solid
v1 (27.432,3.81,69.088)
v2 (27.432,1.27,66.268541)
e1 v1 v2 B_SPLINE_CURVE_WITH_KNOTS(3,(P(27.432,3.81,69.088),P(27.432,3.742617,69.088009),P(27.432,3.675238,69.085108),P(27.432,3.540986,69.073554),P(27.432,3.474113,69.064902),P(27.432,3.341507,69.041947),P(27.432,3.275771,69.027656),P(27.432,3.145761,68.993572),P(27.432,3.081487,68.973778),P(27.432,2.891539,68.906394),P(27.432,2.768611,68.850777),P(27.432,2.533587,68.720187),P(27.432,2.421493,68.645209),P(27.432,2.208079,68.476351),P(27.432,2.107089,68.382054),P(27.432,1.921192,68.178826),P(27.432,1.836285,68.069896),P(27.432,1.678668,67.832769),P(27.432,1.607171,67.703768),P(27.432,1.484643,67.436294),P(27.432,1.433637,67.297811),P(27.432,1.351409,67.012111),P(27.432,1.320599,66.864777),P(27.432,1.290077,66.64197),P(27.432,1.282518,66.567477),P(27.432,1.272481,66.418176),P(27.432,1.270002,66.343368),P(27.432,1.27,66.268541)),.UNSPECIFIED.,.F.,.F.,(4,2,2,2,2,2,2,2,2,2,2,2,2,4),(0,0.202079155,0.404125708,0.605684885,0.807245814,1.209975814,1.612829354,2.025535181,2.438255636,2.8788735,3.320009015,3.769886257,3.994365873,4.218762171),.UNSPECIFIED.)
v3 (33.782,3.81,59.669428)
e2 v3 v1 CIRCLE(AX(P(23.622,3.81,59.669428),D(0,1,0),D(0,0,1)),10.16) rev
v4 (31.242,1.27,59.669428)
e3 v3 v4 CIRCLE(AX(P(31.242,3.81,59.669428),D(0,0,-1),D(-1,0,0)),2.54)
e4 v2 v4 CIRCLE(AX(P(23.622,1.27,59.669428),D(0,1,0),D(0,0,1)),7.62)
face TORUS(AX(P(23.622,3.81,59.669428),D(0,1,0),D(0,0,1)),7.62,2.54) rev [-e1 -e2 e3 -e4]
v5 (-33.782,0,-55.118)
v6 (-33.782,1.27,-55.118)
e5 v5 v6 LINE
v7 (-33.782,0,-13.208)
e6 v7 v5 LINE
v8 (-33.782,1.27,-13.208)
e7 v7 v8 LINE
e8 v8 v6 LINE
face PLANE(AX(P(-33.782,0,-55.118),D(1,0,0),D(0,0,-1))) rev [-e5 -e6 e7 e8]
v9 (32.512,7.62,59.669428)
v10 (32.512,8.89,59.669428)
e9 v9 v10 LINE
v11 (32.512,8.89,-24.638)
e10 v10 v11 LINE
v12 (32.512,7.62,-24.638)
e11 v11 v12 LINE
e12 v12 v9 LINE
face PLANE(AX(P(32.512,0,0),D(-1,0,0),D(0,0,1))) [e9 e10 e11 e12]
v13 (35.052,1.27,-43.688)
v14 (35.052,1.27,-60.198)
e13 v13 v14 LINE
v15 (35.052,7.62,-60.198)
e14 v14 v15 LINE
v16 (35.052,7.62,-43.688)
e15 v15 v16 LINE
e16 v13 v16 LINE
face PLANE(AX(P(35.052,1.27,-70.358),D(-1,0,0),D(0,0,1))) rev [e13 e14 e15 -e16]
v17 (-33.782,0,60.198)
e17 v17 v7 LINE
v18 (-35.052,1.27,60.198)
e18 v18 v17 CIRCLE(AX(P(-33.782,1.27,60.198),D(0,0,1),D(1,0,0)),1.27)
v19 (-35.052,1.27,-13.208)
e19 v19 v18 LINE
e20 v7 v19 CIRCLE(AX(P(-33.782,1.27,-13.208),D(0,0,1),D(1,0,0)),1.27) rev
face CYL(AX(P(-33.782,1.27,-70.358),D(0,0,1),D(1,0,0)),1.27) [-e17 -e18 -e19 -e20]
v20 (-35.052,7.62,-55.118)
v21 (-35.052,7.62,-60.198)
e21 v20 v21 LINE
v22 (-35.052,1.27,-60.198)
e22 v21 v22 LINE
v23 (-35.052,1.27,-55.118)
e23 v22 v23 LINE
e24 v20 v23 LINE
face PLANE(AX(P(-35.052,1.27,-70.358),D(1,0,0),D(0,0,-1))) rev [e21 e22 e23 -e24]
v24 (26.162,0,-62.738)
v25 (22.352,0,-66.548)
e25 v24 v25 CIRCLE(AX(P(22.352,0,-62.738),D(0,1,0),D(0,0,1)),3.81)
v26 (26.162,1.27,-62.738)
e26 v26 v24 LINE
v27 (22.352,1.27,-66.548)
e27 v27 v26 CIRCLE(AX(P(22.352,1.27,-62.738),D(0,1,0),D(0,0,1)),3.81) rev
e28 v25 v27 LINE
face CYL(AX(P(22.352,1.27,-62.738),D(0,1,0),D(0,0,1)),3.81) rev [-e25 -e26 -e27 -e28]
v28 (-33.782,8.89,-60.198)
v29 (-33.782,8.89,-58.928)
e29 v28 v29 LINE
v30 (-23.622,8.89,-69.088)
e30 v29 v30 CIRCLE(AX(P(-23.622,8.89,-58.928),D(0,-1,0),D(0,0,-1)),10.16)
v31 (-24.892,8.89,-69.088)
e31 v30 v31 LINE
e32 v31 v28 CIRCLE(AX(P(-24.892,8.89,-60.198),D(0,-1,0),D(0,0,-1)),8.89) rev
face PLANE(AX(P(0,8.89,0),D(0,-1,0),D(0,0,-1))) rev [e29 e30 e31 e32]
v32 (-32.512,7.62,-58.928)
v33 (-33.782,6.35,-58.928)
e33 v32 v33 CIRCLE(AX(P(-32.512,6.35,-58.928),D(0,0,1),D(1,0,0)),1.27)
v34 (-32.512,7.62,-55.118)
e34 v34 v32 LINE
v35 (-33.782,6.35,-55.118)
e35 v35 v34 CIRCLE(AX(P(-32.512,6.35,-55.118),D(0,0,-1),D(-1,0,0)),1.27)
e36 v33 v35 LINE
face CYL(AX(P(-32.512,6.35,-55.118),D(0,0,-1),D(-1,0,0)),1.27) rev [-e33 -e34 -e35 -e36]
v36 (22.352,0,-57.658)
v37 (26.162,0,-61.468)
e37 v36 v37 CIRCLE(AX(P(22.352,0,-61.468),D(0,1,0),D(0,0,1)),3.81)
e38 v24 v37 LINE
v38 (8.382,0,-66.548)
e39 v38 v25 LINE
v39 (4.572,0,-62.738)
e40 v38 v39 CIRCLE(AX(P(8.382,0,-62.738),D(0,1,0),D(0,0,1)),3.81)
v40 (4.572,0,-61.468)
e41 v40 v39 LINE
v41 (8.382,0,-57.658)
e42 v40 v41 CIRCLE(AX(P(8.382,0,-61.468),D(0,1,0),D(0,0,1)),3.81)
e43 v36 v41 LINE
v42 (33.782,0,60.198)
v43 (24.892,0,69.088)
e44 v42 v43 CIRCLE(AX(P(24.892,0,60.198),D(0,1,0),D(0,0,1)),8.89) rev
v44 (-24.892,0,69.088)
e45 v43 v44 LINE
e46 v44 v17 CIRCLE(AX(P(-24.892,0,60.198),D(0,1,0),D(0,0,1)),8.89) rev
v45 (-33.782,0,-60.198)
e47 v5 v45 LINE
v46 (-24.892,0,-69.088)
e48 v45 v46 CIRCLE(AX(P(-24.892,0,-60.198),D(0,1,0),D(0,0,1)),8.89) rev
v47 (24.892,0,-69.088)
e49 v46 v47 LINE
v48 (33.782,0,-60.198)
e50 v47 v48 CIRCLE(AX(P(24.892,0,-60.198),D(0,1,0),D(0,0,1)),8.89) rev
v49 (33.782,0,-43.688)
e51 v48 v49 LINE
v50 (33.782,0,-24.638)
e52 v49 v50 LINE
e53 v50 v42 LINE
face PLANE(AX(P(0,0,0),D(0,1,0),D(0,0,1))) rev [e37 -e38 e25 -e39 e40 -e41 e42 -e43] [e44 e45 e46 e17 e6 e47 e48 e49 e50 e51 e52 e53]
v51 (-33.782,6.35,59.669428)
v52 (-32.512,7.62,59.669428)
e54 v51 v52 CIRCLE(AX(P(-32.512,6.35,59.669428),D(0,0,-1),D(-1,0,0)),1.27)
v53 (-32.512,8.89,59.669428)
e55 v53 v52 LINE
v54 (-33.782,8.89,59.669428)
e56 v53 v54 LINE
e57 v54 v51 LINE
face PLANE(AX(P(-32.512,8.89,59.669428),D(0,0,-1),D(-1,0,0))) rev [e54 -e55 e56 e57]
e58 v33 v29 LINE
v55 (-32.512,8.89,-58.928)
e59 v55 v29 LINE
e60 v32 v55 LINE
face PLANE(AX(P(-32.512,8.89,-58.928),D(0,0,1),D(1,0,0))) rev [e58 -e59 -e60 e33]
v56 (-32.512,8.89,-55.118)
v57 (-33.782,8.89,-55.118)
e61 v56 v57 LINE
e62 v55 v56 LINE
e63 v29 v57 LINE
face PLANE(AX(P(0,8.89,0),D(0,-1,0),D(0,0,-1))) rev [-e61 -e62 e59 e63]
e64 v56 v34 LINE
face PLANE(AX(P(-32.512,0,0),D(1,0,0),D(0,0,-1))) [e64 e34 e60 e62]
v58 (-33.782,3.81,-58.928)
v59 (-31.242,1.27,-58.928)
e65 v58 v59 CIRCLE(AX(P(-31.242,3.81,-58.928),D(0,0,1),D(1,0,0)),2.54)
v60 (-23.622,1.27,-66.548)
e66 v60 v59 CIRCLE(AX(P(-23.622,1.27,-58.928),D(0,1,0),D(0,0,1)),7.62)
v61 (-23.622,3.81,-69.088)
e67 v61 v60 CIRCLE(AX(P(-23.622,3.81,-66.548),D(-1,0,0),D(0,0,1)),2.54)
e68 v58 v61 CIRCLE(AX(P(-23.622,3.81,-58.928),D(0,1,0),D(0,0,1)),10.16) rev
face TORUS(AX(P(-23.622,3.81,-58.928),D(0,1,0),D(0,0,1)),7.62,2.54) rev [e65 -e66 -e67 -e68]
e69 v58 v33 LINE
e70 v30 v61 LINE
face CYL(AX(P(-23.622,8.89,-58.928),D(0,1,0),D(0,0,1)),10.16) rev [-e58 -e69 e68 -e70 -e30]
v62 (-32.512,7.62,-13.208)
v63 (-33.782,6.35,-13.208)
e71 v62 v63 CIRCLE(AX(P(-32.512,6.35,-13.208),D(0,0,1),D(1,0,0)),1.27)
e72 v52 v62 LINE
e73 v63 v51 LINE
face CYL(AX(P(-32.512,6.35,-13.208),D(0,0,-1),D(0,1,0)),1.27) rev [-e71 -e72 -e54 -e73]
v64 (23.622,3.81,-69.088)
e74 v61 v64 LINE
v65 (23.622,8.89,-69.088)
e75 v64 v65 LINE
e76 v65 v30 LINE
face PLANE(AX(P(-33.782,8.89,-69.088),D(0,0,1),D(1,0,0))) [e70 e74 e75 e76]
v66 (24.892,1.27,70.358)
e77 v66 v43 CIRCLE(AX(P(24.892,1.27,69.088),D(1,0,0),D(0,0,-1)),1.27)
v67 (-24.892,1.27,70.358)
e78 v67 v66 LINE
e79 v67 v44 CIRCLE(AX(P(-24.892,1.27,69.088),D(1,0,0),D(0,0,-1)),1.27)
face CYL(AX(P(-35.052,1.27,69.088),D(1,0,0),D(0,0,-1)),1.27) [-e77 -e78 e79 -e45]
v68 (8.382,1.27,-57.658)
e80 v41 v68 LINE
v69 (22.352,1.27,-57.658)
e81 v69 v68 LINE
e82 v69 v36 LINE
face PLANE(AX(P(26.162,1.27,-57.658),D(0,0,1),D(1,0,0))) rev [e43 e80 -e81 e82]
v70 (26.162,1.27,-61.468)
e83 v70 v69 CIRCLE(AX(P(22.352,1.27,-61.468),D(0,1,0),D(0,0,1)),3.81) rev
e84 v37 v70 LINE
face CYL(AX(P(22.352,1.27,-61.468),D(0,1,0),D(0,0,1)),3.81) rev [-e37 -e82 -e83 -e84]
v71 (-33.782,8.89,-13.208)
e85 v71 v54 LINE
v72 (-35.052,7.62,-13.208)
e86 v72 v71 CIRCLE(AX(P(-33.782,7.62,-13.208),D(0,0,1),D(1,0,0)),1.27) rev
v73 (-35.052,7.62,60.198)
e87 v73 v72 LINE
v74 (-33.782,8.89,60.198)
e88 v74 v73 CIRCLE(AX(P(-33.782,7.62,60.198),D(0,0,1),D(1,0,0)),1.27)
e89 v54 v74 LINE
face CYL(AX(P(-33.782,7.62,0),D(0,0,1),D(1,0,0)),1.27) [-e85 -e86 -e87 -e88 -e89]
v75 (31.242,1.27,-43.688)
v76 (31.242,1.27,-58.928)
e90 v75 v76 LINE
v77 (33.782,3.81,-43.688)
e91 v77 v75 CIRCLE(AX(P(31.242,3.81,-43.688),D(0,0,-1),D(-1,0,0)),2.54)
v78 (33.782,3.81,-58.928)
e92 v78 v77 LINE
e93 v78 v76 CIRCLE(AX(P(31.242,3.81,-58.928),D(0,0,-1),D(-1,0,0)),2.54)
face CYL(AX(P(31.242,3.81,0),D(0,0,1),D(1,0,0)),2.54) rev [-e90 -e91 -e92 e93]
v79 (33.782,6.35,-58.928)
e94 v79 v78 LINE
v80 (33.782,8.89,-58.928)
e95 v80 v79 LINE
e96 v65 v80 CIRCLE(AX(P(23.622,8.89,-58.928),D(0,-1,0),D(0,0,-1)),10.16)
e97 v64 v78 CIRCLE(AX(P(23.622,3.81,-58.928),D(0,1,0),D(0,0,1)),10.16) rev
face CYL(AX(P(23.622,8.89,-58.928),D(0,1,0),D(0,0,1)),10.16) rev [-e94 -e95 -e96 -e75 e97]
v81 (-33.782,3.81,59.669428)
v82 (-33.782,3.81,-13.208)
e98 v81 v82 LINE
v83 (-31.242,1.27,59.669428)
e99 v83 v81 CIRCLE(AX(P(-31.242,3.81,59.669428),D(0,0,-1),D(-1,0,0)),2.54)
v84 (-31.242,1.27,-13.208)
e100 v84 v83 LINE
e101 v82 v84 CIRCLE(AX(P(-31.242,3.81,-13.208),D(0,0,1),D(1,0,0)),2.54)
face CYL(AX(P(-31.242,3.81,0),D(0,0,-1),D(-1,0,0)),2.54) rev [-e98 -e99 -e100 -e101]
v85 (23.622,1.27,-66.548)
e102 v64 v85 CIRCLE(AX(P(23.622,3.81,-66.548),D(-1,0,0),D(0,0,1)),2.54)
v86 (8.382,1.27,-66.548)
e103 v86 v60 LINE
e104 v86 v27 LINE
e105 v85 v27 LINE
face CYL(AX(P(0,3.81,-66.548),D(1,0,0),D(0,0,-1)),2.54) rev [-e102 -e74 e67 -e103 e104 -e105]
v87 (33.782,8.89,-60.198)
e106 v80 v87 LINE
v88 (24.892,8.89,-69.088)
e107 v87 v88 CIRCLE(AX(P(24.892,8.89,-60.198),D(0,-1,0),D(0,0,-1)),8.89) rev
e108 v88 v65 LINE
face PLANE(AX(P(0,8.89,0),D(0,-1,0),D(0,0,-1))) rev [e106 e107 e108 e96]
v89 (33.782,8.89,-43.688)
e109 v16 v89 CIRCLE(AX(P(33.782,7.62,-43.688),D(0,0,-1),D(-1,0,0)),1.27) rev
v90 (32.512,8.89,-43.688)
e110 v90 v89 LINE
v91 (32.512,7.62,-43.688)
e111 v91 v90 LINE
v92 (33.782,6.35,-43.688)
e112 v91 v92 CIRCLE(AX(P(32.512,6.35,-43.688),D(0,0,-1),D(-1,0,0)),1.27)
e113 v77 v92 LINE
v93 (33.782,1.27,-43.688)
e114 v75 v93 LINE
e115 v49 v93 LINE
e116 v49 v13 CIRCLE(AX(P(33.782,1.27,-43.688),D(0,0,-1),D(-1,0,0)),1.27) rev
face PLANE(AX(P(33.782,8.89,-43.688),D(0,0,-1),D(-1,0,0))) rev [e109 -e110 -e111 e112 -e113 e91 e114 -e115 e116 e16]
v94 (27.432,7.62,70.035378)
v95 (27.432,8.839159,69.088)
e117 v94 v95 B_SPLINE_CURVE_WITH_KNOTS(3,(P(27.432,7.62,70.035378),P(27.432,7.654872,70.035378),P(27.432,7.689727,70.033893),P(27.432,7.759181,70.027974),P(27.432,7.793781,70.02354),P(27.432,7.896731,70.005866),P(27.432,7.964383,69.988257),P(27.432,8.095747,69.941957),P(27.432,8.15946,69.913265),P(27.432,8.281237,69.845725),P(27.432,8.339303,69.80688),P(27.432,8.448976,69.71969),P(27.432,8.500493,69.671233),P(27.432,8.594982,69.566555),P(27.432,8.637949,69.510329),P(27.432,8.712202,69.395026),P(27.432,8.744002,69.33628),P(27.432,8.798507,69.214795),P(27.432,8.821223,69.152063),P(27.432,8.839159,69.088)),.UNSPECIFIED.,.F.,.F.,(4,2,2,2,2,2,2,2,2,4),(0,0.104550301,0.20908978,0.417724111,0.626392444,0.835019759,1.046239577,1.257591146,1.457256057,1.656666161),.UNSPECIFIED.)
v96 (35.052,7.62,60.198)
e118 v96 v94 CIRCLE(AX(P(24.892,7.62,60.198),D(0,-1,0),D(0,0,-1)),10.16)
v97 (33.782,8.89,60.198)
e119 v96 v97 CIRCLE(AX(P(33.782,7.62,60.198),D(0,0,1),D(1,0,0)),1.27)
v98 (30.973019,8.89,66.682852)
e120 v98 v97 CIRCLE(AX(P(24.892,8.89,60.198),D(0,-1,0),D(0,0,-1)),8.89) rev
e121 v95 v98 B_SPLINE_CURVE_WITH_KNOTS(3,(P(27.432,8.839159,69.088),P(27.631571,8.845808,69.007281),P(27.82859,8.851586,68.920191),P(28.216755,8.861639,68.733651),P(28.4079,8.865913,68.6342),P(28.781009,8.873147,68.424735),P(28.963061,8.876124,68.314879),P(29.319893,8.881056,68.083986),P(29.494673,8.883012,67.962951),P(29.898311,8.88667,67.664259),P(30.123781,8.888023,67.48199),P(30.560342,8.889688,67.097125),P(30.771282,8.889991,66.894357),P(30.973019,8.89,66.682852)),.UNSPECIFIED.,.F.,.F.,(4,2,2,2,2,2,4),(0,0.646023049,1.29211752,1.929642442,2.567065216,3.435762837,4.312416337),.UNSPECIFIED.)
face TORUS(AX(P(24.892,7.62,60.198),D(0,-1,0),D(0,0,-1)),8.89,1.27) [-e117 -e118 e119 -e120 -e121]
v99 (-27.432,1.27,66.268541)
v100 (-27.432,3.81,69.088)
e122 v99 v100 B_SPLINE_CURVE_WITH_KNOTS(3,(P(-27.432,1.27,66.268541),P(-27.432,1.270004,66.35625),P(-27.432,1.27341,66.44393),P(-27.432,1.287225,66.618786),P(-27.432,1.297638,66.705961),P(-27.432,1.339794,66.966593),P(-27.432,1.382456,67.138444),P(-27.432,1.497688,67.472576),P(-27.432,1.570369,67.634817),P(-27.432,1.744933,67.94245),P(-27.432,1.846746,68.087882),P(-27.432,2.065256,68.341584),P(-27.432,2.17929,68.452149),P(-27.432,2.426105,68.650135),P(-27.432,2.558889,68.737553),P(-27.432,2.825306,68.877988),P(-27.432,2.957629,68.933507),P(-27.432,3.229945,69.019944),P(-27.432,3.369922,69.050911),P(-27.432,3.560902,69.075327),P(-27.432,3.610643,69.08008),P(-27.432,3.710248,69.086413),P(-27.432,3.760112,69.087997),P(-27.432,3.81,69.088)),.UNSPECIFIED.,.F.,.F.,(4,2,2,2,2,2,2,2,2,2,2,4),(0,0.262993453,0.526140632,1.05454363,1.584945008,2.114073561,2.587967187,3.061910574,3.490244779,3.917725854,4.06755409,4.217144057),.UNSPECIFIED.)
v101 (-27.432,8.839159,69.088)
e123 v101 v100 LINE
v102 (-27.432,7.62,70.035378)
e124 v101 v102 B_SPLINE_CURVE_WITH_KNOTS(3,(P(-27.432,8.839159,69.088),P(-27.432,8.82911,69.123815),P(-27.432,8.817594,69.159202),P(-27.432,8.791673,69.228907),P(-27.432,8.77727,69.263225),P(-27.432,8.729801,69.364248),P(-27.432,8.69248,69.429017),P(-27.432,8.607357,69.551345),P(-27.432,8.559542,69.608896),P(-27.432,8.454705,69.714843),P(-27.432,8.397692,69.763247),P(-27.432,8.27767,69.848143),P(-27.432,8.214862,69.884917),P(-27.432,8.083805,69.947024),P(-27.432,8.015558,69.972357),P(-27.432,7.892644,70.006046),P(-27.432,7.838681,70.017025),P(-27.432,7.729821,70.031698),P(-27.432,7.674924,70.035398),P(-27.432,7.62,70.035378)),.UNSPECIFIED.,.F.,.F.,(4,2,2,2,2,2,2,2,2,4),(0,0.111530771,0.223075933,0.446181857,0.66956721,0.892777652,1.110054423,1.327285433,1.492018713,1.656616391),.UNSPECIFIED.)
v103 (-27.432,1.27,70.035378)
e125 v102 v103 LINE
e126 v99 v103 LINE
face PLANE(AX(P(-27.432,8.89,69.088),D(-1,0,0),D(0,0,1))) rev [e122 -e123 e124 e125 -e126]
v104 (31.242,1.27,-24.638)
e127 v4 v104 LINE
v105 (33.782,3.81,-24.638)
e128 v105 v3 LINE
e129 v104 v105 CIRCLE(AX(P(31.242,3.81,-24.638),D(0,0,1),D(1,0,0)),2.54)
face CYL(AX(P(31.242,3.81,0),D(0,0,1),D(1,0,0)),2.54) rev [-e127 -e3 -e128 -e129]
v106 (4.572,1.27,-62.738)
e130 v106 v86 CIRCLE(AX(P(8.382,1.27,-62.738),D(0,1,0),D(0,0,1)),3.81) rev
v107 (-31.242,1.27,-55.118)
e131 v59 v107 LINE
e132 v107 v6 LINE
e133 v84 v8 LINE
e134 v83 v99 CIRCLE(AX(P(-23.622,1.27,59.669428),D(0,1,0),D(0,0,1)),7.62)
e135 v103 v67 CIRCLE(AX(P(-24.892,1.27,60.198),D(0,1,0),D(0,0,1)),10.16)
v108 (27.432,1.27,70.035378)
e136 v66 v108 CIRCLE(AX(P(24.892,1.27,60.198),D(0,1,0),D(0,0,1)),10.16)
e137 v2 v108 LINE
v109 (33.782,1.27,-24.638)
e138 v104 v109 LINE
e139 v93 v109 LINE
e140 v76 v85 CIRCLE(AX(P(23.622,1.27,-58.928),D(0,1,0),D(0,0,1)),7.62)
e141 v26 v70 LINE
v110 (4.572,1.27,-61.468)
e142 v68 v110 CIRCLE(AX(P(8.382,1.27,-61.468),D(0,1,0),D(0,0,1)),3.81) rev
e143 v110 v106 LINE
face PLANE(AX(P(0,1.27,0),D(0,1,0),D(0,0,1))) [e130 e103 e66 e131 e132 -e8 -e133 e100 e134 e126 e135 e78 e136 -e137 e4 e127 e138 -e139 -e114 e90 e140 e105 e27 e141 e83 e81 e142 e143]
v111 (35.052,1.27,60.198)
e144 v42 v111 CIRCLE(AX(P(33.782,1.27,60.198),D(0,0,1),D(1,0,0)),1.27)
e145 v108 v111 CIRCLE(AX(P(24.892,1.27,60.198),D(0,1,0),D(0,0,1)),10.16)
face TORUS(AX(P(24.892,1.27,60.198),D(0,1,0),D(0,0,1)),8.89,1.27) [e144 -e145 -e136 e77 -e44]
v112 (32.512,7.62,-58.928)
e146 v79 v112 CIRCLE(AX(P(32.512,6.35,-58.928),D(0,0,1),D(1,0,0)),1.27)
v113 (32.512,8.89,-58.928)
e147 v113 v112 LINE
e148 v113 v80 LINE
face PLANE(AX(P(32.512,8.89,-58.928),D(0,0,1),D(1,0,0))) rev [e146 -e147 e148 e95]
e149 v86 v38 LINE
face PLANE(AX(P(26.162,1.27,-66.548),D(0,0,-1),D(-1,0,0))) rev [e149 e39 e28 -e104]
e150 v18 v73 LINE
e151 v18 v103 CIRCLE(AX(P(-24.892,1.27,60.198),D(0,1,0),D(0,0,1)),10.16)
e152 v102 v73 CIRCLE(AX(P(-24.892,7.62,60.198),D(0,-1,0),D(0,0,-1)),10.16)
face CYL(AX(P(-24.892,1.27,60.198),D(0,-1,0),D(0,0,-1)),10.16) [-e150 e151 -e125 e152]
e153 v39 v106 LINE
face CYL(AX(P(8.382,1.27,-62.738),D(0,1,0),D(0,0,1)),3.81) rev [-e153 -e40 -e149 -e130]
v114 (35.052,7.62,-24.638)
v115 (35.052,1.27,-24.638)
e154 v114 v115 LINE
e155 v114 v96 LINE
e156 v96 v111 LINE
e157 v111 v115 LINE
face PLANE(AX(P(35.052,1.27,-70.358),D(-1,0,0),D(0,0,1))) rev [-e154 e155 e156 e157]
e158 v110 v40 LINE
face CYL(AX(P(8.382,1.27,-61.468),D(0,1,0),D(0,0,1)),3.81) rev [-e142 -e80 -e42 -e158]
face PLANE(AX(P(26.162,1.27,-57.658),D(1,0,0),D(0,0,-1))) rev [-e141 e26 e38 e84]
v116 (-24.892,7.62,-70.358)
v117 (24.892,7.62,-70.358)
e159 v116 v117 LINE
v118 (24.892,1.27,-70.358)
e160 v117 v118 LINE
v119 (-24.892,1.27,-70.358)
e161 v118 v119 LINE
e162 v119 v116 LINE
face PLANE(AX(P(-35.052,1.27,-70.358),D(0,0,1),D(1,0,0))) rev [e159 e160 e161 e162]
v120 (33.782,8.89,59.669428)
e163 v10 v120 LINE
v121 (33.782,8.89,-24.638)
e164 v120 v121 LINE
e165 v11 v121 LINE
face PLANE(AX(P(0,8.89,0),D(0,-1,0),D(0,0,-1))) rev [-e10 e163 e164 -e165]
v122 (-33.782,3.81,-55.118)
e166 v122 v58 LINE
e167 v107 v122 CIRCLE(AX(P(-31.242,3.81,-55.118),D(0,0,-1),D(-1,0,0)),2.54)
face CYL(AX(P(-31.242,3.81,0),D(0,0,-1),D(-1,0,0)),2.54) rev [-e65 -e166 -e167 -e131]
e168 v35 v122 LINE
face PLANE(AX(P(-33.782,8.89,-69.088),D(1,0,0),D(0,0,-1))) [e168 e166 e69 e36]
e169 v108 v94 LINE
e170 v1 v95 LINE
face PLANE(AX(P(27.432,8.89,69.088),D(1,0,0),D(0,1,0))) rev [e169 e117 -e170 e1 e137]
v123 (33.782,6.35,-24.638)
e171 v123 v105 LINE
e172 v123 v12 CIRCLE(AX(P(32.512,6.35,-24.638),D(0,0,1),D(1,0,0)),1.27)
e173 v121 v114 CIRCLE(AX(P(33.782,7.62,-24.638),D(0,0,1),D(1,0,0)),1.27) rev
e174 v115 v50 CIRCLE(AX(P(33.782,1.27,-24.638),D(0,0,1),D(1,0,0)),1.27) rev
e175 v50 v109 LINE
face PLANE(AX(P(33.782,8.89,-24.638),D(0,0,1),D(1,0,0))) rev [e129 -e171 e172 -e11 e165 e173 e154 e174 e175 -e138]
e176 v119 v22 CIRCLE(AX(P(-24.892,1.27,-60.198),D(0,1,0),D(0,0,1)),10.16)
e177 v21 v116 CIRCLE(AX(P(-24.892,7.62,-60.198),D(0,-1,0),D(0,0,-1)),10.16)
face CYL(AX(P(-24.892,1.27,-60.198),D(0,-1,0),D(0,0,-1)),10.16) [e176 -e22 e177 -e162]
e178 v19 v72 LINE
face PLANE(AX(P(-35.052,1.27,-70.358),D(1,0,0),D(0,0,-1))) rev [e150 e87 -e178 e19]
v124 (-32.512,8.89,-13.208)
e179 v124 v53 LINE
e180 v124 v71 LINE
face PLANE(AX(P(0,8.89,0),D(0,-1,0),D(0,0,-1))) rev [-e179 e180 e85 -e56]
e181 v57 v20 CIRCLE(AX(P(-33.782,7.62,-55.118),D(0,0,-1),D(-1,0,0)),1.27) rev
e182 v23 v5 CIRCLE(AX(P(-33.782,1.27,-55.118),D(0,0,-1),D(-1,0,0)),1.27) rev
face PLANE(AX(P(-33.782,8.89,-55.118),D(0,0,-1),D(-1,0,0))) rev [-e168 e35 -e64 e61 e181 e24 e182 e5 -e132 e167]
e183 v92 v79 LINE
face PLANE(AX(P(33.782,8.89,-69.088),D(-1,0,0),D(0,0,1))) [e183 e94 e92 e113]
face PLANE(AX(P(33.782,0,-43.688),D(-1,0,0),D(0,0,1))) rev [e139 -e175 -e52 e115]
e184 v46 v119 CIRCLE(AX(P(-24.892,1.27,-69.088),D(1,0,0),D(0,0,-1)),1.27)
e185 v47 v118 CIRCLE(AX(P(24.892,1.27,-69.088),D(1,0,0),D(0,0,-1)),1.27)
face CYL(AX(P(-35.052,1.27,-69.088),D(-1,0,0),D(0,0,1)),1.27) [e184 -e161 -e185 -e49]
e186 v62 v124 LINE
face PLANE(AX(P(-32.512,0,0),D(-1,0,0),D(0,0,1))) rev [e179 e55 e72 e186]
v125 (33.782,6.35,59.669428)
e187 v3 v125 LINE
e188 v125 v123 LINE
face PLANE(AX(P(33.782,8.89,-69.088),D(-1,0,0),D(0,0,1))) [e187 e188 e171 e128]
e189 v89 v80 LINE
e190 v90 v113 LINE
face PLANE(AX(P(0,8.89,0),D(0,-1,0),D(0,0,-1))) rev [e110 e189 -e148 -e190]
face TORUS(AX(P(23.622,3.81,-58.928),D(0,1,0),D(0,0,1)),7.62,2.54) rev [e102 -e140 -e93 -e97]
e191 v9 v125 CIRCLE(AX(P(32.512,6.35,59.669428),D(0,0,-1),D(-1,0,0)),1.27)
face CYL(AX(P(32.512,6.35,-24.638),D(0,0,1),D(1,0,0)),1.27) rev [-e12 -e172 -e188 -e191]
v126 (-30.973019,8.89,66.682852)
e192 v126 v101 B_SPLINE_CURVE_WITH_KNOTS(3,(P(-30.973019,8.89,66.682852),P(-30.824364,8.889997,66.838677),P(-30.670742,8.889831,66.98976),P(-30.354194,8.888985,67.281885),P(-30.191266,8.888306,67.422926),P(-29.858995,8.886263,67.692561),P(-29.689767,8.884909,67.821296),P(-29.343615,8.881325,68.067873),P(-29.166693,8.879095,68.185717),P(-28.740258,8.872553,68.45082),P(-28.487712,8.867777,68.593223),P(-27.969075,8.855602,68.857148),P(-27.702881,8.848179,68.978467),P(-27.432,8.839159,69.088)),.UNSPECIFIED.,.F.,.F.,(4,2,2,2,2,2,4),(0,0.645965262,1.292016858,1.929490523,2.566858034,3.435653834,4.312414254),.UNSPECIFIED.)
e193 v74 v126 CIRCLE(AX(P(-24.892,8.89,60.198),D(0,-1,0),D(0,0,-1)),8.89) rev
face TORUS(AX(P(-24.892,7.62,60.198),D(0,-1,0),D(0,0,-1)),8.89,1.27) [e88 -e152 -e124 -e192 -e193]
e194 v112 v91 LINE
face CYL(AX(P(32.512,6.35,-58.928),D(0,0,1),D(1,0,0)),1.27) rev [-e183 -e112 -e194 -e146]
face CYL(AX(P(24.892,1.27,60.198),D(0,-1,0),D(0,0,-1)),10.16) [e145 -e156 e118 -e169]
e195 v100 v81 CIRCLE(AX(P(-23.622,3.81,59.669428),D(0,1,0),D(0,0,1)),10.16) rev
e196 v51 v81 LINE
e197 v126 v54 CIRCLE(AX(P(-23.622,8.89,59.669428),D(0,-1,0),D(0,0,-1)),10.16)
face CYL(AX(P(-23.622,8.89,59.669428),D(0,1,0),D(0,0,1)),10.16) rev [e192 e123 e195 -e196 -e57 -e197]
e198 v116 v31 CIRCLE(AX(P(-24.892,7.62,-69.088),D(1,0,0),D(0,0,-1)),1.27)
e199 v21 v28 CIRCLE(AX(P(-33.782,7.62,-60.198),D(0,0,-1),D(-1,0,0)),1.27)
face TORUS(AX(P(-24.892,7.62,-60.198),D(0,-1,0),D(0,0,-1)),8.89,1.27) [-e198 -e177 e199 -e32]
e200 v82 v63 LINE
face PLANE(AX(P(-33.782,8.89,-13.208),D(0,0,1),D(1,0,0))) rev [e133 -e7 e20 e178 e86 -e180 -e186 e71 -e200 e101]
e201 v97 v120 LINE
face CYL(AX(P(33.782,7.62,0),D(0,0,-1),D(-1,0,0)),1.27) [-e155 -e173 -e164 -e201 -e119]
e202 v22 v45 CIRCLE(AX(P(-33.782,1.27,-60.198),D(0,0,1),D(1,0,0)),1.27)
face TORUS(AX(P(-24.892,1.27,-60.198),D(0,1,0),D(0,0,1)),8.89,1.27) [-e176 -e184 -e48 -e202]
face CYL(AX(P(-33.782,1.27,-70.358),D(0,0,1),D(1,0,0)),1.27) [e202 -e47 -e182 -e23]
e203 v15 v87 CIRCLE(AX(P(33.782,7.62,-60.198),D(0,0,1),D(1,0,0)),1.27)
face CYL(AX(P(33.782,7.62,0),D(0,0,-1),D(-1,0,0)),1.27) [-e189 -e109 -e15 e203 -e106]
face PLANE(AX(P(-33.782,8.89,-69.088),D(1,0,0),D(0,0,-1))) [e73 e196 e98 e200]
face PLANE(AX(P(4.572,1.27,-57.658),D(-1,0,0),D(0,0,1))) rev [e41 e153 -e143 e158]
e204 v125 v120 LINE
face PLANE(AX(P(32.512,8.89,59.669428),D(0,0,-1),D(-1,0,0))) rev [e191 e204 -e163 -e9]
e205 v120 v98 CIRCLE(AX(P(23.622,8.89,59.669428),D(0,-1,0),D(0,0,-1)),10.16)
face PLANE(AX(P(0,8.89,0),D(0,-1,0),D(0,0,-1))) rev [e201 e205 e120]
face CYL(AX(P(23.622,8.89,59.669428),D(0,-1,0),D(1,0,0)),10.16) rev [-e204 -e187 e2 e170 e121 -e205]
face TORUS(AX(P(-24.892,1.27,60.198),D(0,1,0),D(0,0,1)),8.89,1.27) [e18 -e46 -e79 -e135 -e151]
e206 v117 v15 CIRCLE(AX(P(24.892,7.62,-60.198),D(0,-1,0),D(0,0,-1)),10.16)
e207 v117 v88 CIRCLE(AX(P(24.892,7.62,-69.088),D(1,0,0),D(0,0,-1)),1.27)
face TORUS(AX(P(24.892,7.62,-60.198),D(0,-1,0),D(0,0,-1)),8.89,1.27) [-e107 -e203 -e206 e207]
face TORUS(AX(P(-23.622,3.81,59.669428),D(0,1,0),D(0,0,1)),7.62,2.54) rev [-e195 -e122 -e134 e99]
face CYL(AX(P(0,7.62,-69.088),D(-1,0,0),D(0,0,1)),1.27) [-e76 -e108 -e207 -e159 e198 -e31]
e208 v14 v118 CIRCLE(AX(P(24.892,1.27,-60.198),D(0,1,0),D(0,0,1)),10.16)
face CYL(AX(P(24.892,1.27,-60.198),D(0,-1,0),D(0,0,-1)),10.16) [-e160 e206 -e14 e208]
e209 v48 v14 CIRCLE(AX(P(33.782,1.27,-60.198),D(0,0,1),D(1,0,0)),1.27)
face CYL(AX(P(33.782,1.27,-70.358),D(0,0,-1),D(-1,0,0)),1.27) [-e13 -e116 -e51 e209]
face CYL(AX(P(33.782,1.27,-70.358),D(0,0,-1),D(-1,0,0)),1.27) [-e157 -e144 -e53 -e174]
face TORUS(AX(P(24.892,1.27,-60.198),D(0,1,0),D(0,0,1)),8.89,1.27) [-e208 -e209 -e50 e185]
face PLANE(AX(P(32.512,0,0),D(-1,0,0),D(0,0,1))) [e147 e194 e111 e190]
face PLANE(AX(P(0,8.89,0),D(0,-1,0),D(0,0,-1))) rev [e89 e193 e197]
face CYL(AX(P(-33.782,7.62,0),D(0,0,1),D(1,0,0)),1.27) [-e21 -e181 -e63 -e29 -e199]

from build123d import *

# Parameters (mm, degrees)
SKETCH1_W           = 70.104
SKETCH1_H           = 140.716
BOSS_EXTRUDE1_DEPTH = 1.27
SKETCH2_W           = 67.564
SKETCH2_H           = 138.176
BOSS_EXTRUDE2_DEPTH = 7.62
SKETCH3_W           = 41.91
SKETCH3_H           = 7.62
CUT_EXTRUDE1_DEPTH  = 1.27
SKETCH5_W           = 19.05
SKETCH5_H           = 7.62
CUT_EXTRUDE2_DEPTH  = 1.27
SKETCH6_W           = 54.864
SKETCH6_H           = 7.62
CUT_EXTRUDE3_DEPTH  = 1.27
SKETCH7_W           = 21.59
SKETCH7_H           = 8.89
CUT_EXTRUDE4_DEPTH  = 1.27
FILLET1_R           = 10.16
FILLET2_R           = 10.16
SKETCH8_W           = 3.81
SKETCH8_H           = 1.27
BOSS_EXTRUDE3_DEPTH = 1.27
SKETCH14_W          = 15.24
SKETCH14_H          = 1.27
BOSS_EXTRUDE7_DEPTH = 1.27
SKETCH19_W          = 84.307427921
SKETCH19_H          = 1.27
BOSS_EXTRUDE8_DEPTH = 1.27
SKETCH20_W          = 72.877427921
SKETCH20_H          = 1.27
BOSS_EXTRUDE9_DEPTH = 1.27
FILLET9_R           = 3.81
FILLET12_R          = 1.27
FILLET15_R          = 1.27
FILLET16_R          = 2.54
SKETCH28_W          = 1.27
SKETCH28_H          = 19.05
SKETCH28_H_2        = 41.91
CUT_EXTRUDE10_DEPTH = 1.27
FILLET18_R          = 1.27


# Some blends are built 0.0001 mm under size
with BuildPart() as part:
    # Sketch1 → Boss-Extrude1 (new body)
    with BuildSketch(Plane(origin=(0, 0, 0), x_dir=(1, 0, 0), z_dir=(0, 1, 0))):
        Rectangle(SKETCH1_W, SKETCH1_H)
    extrude(amount=BOSS_EXTRUDE1_DEPTH)

    # Sketch2 → Boss-Extrude2 (add)
    with BuildSketch(Plane(origin=(0, 1.27, 0), x_dir=(1, 0, 0), z_dir=(0, 1, 0))):
        Polygon((-35.052, -70.358), (0, -70.358), (35.052, -70.358), (35.052, 70.358), (-35.052, 70.358), align=None)
        Rectangle(SKETCH2_W, SKETCH2_H, mode=Mode.SUBTRACT)
    extrude(amount=BOSS_EXTRUDE2_DEPTH)

    # Sketch3 → Cut-Extrude1 (cut)
    with BuildSketch(Plane.ZY.offset(35.052)):
        with Locations((-34.163, 5.08)):
            Rectangle(SKETCH3_W, SKETCH3_H)
    extrude(amount=-CUT_EXTRUDE1_DEPTH, mode=Mode.SUBTRACT)

    # Sketch5 → Cut-Extrude2 (cut)
    with BuildSketch(Plane(origin=(35.052, 0, 0), x_dir=(0, 0, -1), z_dir=(1, 0, 0))):
        with Locations((34.163, 5.08)):
            Rectangle(SKETCH5_W, SKETCH5_H)
    extrude(amount=-CUT_EXTRUDE2_DEPTH, mode=Mode.SUBTRACT)

    # Sketch6 → Cut-Extrude3 (cut)
    with BuildSketch(Plane.XY.offset(70.358)):
        with Locations((0, 5.08)):
            Rectangle(SKETCH6_W, SKETCH6_H)
    extrude(amount=-CUT_EXTRUDE3_DEPTH, mode=Mode.SUBTRACT)

    # Sketch7 → Cut-Extrude4 (cut)
    with BuildSketch(Plane.XZ):
        with Locations((15.367, -62.103)):
            Rectangle(SKETCH7_W, SKETCH7_H)
    extrude(amount=-CUT_EXTRUDE4_DEPTH, mode=Mode.SUBTRACT)

    # Fillet1
    # the kernel refuses this fillet: 10.16 mm, written as the material it adds along each edge
    with BuildSketch(Plane(origin=(33.782, 1.27, -69.088), x_dir=(0, 0, 1), z_dir=(0, 1, 0)), Plane(origin=(-33.782, 1.27, -69.088), x_dir=(1, 0, 0), z_dir=(0, 1, 0))) as fillet1_piece_1:
        with BuildLine():
            CenterArc((FILLET1_R, -FILLET1_R), FILLET1_R, 90, 90)
            Line((0, -FILLET1_R), (-FILLET1_R * 0.02, -FILLET1_R))
            Line((-FILLET1_R * 0.02, -FILLET1_R), (-FILLET1_R * 0.02, FILLET1_R * 0.02))
            Line((-FILLET1_R * 0.02, FILLET1_R * 0.02), (FILLET1_R, FILLET1_R * 0.02))
            Line((FILLET1_R, FILLET1_R * 0.02), (FILLET1_R, 0))
        make_face()
    extrude(amount=7.62)
    with BuildSketch(Plane(origin=(-33.782, 1.27, 69.088), x_dir=(0, 0, -1), z_dir=(0, 1, 0))) as fillet1_piece_2:
        with BuildLine():
            CenterArc((9.418572079, -10.16), FILLET1_R, 90, 67.975687163)
            Line((0, -6.35), (-0.188371442, -6.2738))
            ThreePointArc((-0.188371442, -6.2738), (-0.2032, -3.175), (-0.2032, 0))
            Line((-0.2032, 0), (0, 0.2032))
            Line((0, 0.2032), (9.418572079, 0.2032))
            Line((9.418572079, 0.2032), (9.418572079, 0))
        make_face()
    extrude(amount=7.62)
    with BuildSketch(Plane(origin=(33.782, 1.27, 69.088), x_dir=(-1, 0, 0), z_dir=(0, 1, 0))) as fillet1_piece_3:
        with BuildLine():
            CenterArc((10.16, -9.418572079), FILLET1_R, 112.024312837, 67.975687163)
            Line((0, -9.418572079), (-0.2032, -9.418572079))
            Line((-0.2032, -9.418572079), (-0.2032, 0))
            Line((-0.2032, 0), (0, 0.2032))
            ThreePointArc((0, 0.2032), (3.175, 0.2032), (6.2738, 0.188371442))
            Line((6.2738, 0.188371442), (6.35, 0))
        make_face()
    extrude(amount=7.62)

    # Fillet2
    fillet2_edges = [part.edges().sort_by_distance(p)[0] for p in [
        (-35.052, 4.445, -70.358),
        (35.052, 4.445, -70.358),
        (35.052, 4.445, 70.358),
        (-35.052, 4.445, 70.358),
    ]]
    fillet(fillet2_edges, radius=FILLET2_R)

    # Sketch8 → Boss-Extrude3 (add)
    with BuildSketch(Plane(origin=(-33.782, 0, 0), x_dir=(0, 0, -1), z_dir=(1, 0, 0))):
        with Locations((57.023, 8.255)):
            Rectangle(SKETCH8_W, SKETCH8_H)
    extrude(amount=BOSS_EXTRUDE3_DEPTH)

    # Sketch14 → Boss-Extrude7 (add)
    with BuildSketch(Plane.ZY.offset(-33.782)):
        with Locations((-51.308, 8.255)):
            Rectangle(SKETCH14_W, SKETCH14_H)
    extrude(amount=BOSS_EXTRUDE7_DEPTH)

    # Sketch19 → Boss-Extrude8 (add)
    with BuildSketch(Plane.ZY.offset(-33.782)):
        with Locations((17.515713961, 8.255)):
            Rectangle(SKETCH19_W, SKETCH19_H)
    extrude(amount=BOSS_EXTRUDE8_DEPTH)

    # Sketch20 → Boss-Extrude9 (add)
    with BuildSketch(Plane(origin=(-33.782, 0, 0), x_dir=(0, 0, -1), z_dir=(1, 0, 0))):
        with Locations((-23.230713961, 8.255)):
            Rectangle(SKETCH20_W, SKETCH20_H)
    extrude(amount=BOSS_EXTRUDE9_DEPTH)

    # Fillet9
    fillet9_edges = [part.edges().sort_by_distance(p)[0] for p in [
        (26.162, 0.635, -57.658),
        (26.162, 0.635, -66.548),
        (4.572, 0.635, -66.548),
        (4.572, 0.635, -57.658),
    ]]
    fillet(fillet9_edges, radius=FILLET9_R)

    # Fillet12
    fillet12_edges = [part.edges().sort_by_distance(p)[0] for p in [
        (32.076204897, 0, 67.382204897),
        (0, 0, 70.358),
        (-32.076204897, 0, 67.382204897),
        (-35.052, 0, 0),
        (-32.076204897, 0, -67.382204897),
        (0, 0, -70.358),
        (32.076204897, 0, -67.382204897),
        (35.052, 0, 0),
    ]]
    fillet(fillet12_edges, radius=FILLET12_R - 0.0001)  # a hair under: the kernel refuses the full size

    # Fillet15
    fillet15_edges = [part.edges().sort_by_distance(p)[0] for p in [
        (-35.052, 8.89, -57.658),
        (0, 8.89, -70.358),
        (-32.076204897, 8.89, -67.382204897),
        (35.052, 8.89, 17.78),
        (-35.052, 8.89, 23.495),
        (32.076204897, 8.89, -67.382204897),
        (32.924185257, 8.89, 66.419703947),
        (-32.924185257, 8.89, 66.419703947),
        (35.052, 8.89, -51.943),
    ]]
    fillet(fillet15_edges, radius=FILLET15_R - 0.0001)  # a hair under: the kernel refuses the full size

    # Fillet16
    fillet16_edges = [part.edges().sort_by_distance(p)[0] for p in [
        (0, 1.27, -69.088),
        (-33.782, 1.27, -57.023),
        (33.782, 1.27, 17.515713961),
        (-30.806204897, 1.27, -66.112204897),
        (30.806204897, 1.27, -66.112204897),
        (32.046226968, 1.27, 65.349040584),
        (-32.046226968, 1.27, 65.349040584),
        (-33.782, 1.27, 23.230713961),
        (33.782, 1.27, -51.308),
    ]]
    fillet(fillet16_edges, radius=FILLET16_R - 0.0001)  # a hair under: the kernel refuses the full size

    # Sketch28 → Cut-Extrude10 (cut)
    with BuildSketch(Plane(origin=(0, 1.27, 0), x_dir=(1, 0, 0), z_dir=(0, 1, 0))):
        with Locations((34.417, 34.163)):
            Rectangle(SKETCH28_W, SKETCH28_H)
        with Locations((-34.417, 34.163)):
            Rectangle(SKETCH28_W, SKETCH28_H_2)
    extrude(amount=-CUT_EXTRUDE10_DEPTH, mode=Mode.SUBTRACT)

    # Fillet18
    fillet18_edges = [part.edges().sort_by_distance(p)[0] for p in [
        (33.782, 7.62, -51.308),
        (-33.782, 7.62, -57.023),
        (33.782, 7.62, 17.515713961),
        (-33.782, 7.62, 23.230713961),
    ]]
    fillet(fillet18_edges, radius=FILLET18_R - 0.0001)  # a hair under: the kernel refuses the full size


solid = part.part
